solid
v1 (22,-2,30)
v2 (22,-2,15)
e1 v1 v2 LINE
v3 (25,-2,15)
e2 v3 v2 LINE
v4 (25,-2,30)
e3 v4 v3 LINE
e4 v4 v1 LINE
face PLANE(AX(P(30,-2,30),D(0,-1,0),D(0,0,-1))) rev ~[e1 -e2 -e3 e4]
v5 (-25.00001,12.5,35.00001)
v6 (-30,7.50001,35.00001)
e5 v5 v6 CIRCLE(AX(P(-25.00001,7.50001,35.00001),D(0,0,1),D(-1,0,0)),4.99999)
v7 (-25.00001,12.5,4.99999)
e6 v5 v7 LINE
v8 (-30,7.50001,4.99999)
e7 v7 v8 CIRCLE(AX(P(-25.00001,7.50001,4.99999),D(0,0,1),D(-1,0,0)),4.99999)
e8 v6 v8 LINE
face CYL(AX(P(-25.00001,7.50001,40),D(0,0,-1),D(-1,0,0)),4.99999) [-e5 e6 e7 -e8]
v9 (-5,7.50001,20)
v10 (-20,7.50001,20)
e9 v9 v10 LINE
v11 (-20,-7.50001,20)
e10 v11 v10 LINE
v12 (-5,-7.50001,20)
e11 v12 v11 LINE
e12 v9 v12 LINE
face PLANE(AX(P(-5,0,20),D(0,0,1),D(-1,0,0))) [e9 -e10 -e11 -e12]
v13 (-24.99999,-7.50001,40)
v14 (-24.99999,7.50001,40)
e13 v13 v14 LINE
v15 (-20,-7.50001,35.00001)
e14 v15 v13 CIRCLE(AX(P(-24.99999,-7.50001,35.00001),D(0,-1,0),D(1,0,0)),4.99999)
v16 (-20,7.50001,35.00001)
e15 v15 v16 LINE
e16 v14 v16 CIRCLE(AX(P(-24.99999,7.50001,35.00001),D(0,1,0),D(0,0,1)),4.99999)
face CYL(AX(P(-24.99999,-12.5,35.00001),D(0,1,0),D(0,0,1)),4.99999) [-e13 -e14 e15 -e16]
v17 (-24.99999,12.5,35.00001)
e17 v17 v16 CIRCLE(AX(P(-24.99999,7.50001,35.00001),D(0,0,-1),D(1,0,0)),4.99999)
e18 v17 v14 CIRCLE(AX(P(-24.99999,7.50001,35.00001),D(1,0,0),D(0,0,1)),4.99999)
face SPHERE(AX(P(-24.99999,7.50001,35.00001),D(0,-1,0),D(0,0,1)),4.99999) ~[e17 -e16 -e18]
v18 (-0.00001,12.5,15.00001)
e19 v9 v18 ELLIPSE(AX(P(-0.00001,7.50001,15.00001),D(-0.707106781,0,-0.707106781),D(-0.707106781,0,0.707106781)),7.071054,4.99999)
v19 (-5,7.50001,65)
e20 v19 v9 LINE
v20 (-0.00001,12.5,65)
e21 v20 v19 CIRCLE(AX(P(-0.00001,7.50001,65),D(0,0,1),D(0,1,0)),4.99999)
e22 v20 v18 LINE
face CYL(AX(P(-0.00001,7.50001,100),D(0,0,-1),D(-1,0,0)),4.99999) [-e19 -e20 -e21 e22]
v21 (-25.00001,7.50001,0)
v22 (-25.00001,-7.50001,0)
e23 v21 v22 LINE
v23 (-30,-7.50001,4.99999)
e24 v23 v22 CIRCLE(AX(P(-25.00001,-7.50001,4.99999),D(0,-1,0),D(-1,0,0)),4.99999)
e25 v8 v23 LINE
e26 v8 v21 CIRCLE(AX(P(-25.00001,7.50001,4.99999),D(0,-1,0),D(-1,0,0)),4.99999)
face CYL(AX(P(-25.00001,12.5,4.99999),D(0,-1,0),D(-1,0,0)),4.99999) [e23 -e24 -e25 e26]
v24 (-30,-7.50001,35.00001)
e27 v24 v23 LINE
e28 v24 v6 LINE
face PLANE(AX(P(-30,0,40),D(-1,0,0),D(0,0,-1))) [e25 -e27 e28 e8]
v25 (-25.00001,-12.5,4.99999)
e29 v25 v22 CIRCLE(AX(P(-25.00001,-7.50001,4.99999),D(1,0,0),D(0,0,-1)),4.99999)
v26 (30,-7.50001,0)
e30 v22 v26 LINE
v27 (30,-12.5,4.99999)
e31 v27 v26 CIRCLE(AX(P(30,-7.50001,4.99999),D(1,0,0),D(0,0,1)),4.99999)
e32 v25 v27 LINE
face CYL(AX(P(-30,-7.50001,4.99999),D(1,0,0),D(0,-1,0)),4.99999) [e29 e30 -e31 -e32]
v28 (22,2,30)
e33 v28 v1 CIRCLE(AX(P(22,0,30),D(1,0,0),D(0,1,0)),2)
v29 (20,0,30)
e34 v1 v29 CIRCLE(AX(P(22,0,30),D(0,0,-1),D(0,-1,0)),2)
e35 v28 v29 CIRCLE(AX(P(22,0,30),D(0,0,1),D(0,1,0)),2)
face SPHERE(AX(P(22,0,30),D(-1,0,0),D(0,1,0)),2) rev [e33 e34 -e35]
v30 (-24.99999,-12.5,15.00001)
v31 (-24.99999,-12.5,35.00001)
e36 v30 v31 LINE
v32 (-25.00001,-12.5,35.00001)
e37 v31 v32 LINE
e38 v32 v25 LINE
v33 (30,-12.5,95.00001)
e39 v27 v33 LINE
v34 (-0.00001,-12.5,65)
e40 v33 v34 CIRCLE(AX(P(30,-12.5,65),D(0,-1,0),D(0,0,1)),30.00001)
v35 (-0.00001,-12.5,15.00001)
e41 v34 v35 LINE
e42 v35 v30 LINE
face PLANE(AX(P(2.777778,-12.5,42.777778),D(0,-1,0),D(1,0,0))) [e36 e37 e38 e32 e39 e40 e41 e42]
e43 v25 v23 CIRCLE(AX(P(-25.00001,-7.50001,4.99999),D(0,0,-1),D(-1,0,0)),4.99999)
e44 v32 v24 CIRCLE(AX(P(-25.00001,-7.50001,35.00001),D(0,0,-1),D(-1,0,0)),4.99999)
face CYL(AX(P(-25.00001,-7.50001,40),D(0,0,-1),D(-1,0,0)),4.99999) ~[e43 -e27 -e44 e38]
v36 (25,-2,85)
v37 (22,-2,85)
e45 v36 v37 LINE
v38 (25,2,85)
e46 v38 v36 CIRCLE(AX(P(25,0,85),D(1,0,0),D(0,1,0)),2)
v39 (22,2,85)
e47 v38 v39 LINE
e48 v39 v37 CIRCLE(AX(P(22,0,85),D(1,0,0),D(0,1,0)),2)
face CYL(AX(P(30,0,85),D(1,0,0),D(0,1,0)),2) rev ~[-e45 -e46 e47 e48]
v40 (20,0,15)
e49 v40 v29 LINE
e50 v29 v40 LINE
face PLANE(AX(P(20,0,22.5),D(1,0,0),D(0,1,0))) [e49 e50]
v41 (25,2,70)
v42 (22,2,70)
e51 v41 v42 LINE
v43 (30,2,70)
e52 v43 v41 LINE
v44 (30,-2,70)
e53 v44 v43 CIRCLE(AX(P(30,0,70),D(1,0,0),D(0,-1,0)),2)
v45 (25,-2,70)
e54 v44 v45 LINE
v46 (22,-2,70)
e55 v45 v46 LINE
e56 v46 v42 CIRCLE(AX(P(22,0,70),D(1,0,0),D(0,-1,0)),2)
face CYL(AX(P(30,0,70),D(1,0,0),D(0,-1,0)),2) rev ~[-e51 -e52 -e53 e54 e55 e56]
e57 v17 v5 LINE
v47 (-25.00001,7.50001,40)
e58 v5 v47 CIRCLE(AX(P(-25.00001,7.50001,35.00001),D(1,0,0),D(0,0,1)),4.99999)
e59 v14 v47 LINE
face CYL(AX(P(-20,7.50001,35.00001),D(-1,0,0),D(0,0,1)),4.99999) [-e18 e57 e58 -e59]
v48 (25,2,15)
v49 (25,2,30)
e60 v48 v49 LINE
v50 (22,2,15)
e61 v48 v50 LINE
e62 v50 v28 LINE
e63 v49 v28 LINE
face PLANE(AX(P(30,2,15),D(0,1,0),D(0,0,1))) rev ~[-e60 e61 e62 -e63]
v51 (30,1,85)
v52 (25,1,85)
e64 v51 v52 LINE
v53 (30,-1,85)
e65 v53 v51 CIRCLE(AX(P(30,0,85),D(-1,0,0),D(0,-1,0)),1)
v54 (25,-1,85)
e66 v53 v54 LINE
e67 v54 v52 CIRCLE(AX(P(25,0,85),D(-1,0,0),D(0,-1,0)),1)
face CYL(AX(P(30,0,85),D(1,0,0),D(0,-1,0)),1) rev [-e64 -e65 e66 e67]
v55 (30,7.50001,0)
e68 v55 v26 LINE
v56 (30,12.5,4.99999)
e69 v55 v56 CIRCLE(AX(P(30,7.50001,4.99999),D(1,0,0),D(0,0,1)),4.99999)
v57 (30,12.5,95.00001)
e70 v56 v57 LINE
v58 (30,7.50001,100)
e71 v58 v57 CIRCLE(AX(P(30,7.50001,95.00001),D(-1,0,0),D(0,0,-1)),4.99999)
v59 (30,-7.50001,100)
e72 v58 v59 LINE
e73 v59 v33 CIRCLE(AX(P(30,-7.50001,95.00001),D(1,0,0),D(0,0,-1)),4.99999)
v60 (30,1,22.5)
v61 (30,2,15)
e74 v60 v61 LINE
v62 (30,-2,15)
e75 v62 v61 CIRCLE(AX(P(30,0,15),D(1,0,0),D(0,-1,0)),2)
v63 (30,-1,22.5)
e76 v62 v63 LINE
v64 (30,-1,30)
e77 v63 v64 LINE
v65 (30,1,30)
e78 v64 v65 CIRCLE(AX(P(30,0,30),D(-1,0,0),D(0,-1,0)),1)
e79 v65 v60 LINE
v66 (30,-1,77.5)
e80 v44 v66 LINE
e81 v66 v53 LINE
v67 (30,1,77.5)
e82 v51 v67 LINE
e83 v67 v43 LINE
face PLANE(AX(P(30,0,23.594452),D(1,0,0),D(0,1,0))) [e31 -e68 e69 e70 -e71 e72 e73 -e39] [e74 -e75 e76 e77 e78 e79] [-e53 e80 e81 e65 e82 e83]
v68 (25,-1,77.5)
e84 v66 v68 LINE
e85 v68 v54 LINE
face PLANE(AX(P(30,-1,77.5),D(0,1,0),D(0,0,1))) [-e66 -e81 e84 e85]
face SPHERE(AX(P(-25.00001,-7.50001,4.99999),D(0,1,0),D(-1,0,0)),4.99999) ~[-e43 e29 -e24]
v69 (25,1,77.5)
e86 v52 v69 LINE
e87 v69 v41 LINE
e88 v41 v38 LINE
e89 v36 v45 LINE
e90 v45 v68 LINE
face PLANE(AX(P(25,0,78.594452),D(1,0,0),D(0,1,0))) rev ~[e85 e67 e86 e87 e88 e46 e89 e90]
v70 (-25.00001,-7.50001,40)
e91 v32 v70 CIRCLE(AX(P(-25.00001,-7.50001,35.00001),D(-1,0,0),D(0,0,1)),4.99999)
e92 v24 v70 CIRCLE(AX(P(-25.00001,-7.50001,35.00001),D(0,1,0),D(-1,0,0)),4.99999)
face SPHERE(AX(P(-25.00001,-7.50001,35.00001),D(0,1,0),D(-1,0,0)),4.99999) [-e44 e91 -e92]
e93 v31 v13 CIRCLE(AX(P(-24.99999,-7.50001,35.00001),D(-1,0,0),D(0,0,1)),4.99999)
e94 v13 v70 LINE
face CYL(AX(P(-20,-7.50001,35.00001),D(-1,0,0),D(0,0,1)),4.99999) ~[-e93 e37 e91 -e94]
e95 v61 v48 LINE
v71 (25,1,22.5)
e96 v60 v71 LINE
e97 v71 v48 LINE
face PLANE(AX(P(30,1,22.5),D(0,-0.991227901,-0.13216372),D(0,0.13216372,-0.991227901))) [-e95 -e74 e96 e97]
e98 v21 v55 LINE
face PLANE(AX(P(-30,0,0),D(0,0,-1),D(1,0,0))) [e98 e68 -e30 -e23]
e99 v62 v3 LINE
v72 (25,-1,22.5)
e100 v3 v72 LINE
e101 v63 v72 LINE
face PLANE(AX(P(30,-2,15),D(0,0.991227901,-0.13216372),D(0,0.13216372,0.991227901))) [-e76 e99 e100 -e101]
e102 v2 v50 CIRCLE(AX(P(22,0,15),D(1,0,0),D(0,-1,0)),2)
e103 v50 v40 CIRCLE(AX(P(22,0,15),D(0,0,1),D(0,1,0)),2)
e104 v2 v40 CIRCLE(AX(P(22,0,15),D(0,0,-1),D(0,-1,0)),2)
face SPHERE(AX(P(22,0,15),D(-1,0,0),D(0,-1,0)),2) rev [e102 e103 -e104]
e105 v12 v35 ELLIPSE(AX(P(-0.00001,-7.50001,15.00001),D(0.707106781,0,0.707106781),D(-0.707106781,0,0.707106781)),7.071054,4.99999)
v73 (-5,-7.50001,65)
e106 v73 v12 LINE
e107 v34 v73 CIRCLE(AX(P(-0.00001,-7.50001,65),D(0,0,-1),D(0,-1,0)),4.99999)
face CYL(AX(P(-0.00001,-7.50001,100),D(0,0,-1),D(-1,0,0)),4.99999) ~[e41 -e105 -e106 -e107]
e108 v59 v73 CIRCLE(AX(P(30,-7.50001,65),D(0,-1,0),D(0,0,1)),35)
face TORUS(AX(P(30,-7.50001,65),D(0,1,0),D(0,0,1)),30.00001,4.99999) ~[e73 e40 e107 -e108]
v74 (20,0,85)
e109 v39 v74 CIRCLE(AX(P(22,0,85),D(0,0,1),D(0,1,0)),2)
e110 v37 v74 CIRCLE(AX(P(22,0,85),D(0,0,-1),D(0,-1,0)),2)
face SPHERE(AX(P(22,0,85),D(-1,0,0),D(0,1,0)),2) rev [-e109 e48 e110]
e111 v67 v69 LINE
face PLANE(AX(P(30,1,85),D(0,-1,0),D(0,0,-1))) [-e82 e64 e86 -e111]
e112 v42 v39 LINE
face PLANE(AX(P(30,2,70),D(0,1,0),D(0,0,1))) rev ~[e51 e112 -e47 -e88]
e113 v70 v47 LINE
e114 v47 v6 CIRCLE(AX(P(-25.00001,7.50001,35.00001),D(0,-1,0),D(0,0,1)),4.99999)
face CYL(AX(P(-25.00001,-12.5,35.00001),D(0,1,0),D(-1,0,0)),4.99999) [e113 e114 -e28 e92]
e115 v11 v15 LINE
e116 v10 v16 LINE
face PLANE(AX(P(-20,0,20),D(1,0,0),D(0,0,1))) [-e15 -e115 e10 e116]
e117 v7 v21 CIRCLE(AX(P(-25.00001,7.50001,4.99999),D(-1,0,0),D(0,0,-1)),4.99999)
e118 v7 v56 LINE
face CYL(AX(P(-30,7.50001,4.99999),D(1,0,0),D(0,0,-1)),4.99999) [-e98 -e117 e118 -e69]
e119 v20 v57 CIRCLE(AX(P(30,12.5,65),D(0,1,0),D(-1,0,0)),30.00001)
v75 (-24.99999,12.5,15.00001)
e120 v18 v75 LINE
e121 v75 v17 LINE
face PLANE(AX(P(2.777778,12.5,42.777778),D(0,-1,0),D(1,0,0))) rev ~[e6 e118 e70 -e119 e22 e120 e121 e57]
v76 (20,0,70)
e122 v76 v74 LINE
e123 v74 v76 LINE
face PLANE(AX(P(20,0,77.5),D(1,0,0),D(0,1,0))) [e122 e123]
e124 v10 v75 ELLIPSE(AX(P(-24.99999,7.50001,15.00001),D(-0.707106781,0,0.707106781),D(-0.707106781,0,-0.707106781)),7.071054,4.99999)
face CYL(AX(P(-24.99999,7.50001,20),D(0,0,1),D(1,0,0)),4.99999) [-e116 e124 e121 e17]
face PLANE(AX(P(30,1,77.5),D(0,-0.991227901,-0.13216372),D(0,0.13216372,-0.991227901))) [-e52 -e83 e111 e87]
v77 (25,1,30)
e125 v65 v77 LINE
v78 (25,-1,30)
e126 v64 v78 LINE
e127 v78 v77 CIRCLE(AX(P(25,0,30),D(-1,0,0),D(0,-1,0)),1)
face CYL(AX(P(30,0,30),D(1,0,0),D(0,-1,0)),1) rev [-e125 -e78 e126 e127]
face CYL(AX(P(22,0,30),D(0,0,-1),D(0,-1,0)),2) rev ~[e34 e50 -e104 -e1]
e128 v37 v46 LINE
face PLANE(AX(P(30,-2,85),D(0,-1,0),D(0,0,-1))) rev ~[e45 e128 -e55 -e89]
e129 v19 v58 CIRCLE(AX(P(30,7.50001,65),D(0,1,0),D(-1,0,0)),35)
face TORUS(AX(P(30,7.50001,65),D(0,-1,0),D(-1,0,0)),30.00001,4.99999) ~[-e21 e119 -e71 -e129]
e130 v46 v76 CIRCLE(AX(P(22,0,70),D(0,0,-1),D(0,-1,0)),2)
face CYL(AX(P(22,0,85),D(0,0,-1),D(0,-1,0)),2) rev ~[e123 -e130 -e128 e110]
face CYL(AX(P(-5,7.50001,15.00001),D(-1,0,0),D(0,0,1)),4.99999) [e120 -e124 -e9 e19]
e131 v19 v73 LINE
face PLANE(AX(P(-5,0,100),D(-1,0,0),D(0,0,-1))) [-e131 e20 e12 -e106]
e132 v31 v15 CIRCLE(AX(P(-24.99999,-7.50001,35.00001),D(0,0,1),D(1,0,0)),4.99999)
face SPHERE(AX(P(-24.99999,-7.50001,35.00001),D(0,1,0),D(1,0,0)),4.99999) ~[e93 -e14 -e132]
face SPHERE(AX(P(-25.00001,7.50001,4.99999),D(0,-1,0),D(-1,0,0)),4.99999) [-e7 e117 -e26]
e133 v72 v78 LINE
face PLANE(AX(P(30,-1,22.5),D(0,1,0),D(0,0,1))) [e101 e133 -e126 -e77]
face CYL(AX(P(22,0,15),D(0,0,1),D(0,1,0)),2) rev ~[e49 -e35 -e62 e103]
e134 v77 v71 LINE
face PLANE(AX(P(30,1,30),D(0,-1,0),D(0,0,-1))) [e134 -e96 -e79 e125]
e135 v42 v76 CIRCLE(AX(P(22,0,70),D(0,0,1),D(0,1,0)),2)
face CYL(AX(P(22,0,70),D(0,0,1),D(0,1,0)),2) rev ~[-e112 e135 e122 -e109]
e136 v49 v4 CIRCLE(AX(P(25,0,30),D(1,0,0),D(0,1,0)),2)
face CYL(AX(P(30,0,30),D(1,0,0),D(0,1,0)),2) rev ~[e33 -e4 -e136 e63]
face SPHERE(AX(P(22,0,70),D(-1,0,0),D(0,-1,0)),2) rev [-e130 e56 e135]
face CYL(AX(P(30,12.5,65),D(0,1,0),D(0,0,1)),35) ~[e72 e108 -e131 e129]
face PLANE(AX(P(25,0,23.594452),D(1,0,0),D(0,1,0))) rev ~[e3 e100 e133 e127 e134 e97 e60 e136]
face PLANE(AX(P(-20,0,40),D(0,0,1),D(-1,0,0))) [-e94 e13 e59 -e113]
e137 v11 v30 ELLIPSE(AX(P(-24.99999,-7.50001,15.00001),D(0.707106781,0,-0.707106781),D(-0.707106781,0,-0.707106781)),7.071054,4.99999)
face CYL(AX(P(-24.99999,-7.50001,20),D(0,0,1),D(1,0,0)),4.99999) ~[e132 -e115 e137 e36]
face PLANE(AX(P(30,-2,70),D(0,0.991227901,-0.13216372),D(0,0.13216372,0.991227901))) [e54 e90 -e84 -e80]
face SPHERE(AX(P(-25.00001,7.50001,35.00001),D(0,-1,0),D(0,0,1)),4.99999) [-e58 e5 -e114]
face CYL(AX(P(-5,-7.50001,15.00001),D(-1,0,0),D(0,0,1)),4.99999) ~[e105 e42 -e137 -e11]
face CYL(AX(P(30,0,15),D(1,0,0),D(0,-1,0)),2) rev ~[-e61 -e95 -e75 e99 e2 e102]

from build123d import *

# Parameters (mm, degrees)
F1_DEPTH    = 12.5
F2_R        = 4.99999
F3_T1_DEPTH = 25
F3_T4_ANGLE = 90
F3_T6_ANGLE = 90
F5_DEPTH    = 10
F7_DEPTH    = 5
F8_R        = 2


# Not quite as in the source:
# - a fillet or chamfer that OpenCascade refuses, or shapes differently, is made with other operations: its cross-section is extruded or revolved along the edge and cut away or added
# - a fillet or chamfer is up to 0.001 mm smaller than in the source, because OpenCascade refuses the exact size


with BuildPart() as f1:
    # F0 (on Front) → F1 (new body, symmetric)
    with BuildSketch(Plane.XZ):
        Polygon((-30, 40), (-30, 0), (30, 0), (30, 100), (-5, 100), (-5, 20), (-20, 20), (-20, 40), align=None)
    extrude(amount=F1_DEPTH, both=True)

    # F2 (radius 5 in the source; OpenCascade refuses exactly that, so slightly less here)
    f2_edges = [f1.edges().sort_by_distance(p)[0] for p in [
        (-30, 0, 40),
        (-30, 0, 0),
        (-20, 0, 40),
        (-12.5, -12.5, 20),
        (-12.5, 12.5, 20),
        (-30, -12.5, 20),
        (-20, -12.5, 30),
        (-25, -12.5, 40),
        (-25, 12.5, 40),
        (-30, 12.5, 20),
        (-20, 12.5, 30),
        (0, -12.5, 0),
        (0, 12.5, 0),
        (-5, -12.5, 60),
        (-5, 12.5, 60),
        (12.5, -12.5, 100),
        (12.5, 12.5, 100),
    ]]
    fillet(f2_edges, radius=F2_R)

    # F3: fillet of radius 35 on 1 edges, made by hand

    # F3_s2 → F3_t1 (cut)
    with BuildSketch(Plane.XZ.offset(-12.5)):
        with BuildLine():
            ThreePointArc((30, 100), (5.2512626585, 89.7487373415), (-5, 65))
            Line((-5, 65), (-5, 100))
            Line((-5, 100), (30, 100))
        make_face()
    extrude(amount=F3_T1_DEPTH, mode=Mode.SUBTRACT)

    # F3_s3 → F3_t4 (revolve, cut)
    with BuildSketch(Plane.XY.offset(65)):
        with BuildLine():
            ThreePointArc((-1e-05, 12.5), (-3.5355368349, 11.0355368349), (-5, 7.50001))
            Line((-5, 7.50001), (-5, 12.5))
            Line((-5, 12.5), (-1e-05, 12.5))
        make_face()
    revolve(axis=Axis((30, 12.5, 65), (0, 1, 0)), revolution_arc=F3_T4_ANGLE, mode=Mode.SUBTRACT)

    # F3_s5 → F3_t6 (revolve, cut)
    with BuildSketch(Plane.YZ.offset(30)):
        with BuildLine():
            ThreePointArc((-12.5, 95.00001), (-11.0355368349, 98.5355368349), (-7.50001, 100))
            Line((-7.50001, 100), (-12.5, 100))
            Line((-12.5, 100), (-12.5, 95.00001))
        make_face()
    revolve(axis=Axis((30, -12.5, 65), (0, -1, 0)), revolution_arc=F3_T6_ANGLE, mode=Mode.SUBTRACT)

    # F4 (on face) → F5 (cut)
    with BuildSketch(Plane.YZ.offset(30)):
        with BuildLine():
            ThreePointArc((-2, 15), (0, 13), (2, 15))
            Line((2, 15), (2, 30))
            ThreePointArc((2, 30), (0, 32), (-2, 30))
            Line((-2, 30), (-2, 15))
        make_face()
        with BuildLine():
            ThreePointArc((-2, 70), (0, 68), (2, 70))
            Line((2, 70), (2, 85))
            ThreePointArc((2, 85), (0, 87), (-2, 85))
            Line((-2, 85), (-2, 70))
        make_face()
    extrude(amount=-F5_DEPTH, mode=Mode.SUBTRACT)

    # F6 (on face) → F7 (join)
    with BuildSketch(Plane.YZ.offset(30)):
        with BuildLine():
            ThreePointArc((-1, 30), (0, 31), (1, 30))
            Line((1, 30), (1, 22.5))
            Line((1, 22.5), (2, 15))
            Line((2, 15), (2, 30))
            ThreePointArc((2, 30), (0, 32), (-2, 30))
            Line((-2, 30), (-2, 15))
            Line((-2, 15), (-1, 22.5))
            Line((-1, 22.5), (-1, 30))
        make_face()
        with BuildLine():
            Line((1, 85), (1, 77.5))
            Line((1, 77.5), (2, 70))
            Line((2, 70), (2, 85))
            ThreePointArc((2, 85), (0, 87), (-2, 85))
            Line((-2, 85), (-2, 70))
            Line((-2, 70), (-1, 77.5))
            Line((-1, 77.5), (-1, 85))
            ThreePointArc((-1, 85), (0, 86), (1, 85))
        make_face()
    extrude(amount=-F7_DEPTH)

    # F8
    f8_edges = [f1.edges().sort_by_distance(p)[0] for p in [
        (20, 0, 13),
        (20, 2, 22.5),
        (20, 0, 32),
        (20, -2, 22.5),
        (20, 0, 68),
        (20, 2, 77.5),
        (20, 0, 87),
        (20, -2, 77.5),
    ]]
    fillet(f8_edges, radius=F8_R)


solid = f1.part
